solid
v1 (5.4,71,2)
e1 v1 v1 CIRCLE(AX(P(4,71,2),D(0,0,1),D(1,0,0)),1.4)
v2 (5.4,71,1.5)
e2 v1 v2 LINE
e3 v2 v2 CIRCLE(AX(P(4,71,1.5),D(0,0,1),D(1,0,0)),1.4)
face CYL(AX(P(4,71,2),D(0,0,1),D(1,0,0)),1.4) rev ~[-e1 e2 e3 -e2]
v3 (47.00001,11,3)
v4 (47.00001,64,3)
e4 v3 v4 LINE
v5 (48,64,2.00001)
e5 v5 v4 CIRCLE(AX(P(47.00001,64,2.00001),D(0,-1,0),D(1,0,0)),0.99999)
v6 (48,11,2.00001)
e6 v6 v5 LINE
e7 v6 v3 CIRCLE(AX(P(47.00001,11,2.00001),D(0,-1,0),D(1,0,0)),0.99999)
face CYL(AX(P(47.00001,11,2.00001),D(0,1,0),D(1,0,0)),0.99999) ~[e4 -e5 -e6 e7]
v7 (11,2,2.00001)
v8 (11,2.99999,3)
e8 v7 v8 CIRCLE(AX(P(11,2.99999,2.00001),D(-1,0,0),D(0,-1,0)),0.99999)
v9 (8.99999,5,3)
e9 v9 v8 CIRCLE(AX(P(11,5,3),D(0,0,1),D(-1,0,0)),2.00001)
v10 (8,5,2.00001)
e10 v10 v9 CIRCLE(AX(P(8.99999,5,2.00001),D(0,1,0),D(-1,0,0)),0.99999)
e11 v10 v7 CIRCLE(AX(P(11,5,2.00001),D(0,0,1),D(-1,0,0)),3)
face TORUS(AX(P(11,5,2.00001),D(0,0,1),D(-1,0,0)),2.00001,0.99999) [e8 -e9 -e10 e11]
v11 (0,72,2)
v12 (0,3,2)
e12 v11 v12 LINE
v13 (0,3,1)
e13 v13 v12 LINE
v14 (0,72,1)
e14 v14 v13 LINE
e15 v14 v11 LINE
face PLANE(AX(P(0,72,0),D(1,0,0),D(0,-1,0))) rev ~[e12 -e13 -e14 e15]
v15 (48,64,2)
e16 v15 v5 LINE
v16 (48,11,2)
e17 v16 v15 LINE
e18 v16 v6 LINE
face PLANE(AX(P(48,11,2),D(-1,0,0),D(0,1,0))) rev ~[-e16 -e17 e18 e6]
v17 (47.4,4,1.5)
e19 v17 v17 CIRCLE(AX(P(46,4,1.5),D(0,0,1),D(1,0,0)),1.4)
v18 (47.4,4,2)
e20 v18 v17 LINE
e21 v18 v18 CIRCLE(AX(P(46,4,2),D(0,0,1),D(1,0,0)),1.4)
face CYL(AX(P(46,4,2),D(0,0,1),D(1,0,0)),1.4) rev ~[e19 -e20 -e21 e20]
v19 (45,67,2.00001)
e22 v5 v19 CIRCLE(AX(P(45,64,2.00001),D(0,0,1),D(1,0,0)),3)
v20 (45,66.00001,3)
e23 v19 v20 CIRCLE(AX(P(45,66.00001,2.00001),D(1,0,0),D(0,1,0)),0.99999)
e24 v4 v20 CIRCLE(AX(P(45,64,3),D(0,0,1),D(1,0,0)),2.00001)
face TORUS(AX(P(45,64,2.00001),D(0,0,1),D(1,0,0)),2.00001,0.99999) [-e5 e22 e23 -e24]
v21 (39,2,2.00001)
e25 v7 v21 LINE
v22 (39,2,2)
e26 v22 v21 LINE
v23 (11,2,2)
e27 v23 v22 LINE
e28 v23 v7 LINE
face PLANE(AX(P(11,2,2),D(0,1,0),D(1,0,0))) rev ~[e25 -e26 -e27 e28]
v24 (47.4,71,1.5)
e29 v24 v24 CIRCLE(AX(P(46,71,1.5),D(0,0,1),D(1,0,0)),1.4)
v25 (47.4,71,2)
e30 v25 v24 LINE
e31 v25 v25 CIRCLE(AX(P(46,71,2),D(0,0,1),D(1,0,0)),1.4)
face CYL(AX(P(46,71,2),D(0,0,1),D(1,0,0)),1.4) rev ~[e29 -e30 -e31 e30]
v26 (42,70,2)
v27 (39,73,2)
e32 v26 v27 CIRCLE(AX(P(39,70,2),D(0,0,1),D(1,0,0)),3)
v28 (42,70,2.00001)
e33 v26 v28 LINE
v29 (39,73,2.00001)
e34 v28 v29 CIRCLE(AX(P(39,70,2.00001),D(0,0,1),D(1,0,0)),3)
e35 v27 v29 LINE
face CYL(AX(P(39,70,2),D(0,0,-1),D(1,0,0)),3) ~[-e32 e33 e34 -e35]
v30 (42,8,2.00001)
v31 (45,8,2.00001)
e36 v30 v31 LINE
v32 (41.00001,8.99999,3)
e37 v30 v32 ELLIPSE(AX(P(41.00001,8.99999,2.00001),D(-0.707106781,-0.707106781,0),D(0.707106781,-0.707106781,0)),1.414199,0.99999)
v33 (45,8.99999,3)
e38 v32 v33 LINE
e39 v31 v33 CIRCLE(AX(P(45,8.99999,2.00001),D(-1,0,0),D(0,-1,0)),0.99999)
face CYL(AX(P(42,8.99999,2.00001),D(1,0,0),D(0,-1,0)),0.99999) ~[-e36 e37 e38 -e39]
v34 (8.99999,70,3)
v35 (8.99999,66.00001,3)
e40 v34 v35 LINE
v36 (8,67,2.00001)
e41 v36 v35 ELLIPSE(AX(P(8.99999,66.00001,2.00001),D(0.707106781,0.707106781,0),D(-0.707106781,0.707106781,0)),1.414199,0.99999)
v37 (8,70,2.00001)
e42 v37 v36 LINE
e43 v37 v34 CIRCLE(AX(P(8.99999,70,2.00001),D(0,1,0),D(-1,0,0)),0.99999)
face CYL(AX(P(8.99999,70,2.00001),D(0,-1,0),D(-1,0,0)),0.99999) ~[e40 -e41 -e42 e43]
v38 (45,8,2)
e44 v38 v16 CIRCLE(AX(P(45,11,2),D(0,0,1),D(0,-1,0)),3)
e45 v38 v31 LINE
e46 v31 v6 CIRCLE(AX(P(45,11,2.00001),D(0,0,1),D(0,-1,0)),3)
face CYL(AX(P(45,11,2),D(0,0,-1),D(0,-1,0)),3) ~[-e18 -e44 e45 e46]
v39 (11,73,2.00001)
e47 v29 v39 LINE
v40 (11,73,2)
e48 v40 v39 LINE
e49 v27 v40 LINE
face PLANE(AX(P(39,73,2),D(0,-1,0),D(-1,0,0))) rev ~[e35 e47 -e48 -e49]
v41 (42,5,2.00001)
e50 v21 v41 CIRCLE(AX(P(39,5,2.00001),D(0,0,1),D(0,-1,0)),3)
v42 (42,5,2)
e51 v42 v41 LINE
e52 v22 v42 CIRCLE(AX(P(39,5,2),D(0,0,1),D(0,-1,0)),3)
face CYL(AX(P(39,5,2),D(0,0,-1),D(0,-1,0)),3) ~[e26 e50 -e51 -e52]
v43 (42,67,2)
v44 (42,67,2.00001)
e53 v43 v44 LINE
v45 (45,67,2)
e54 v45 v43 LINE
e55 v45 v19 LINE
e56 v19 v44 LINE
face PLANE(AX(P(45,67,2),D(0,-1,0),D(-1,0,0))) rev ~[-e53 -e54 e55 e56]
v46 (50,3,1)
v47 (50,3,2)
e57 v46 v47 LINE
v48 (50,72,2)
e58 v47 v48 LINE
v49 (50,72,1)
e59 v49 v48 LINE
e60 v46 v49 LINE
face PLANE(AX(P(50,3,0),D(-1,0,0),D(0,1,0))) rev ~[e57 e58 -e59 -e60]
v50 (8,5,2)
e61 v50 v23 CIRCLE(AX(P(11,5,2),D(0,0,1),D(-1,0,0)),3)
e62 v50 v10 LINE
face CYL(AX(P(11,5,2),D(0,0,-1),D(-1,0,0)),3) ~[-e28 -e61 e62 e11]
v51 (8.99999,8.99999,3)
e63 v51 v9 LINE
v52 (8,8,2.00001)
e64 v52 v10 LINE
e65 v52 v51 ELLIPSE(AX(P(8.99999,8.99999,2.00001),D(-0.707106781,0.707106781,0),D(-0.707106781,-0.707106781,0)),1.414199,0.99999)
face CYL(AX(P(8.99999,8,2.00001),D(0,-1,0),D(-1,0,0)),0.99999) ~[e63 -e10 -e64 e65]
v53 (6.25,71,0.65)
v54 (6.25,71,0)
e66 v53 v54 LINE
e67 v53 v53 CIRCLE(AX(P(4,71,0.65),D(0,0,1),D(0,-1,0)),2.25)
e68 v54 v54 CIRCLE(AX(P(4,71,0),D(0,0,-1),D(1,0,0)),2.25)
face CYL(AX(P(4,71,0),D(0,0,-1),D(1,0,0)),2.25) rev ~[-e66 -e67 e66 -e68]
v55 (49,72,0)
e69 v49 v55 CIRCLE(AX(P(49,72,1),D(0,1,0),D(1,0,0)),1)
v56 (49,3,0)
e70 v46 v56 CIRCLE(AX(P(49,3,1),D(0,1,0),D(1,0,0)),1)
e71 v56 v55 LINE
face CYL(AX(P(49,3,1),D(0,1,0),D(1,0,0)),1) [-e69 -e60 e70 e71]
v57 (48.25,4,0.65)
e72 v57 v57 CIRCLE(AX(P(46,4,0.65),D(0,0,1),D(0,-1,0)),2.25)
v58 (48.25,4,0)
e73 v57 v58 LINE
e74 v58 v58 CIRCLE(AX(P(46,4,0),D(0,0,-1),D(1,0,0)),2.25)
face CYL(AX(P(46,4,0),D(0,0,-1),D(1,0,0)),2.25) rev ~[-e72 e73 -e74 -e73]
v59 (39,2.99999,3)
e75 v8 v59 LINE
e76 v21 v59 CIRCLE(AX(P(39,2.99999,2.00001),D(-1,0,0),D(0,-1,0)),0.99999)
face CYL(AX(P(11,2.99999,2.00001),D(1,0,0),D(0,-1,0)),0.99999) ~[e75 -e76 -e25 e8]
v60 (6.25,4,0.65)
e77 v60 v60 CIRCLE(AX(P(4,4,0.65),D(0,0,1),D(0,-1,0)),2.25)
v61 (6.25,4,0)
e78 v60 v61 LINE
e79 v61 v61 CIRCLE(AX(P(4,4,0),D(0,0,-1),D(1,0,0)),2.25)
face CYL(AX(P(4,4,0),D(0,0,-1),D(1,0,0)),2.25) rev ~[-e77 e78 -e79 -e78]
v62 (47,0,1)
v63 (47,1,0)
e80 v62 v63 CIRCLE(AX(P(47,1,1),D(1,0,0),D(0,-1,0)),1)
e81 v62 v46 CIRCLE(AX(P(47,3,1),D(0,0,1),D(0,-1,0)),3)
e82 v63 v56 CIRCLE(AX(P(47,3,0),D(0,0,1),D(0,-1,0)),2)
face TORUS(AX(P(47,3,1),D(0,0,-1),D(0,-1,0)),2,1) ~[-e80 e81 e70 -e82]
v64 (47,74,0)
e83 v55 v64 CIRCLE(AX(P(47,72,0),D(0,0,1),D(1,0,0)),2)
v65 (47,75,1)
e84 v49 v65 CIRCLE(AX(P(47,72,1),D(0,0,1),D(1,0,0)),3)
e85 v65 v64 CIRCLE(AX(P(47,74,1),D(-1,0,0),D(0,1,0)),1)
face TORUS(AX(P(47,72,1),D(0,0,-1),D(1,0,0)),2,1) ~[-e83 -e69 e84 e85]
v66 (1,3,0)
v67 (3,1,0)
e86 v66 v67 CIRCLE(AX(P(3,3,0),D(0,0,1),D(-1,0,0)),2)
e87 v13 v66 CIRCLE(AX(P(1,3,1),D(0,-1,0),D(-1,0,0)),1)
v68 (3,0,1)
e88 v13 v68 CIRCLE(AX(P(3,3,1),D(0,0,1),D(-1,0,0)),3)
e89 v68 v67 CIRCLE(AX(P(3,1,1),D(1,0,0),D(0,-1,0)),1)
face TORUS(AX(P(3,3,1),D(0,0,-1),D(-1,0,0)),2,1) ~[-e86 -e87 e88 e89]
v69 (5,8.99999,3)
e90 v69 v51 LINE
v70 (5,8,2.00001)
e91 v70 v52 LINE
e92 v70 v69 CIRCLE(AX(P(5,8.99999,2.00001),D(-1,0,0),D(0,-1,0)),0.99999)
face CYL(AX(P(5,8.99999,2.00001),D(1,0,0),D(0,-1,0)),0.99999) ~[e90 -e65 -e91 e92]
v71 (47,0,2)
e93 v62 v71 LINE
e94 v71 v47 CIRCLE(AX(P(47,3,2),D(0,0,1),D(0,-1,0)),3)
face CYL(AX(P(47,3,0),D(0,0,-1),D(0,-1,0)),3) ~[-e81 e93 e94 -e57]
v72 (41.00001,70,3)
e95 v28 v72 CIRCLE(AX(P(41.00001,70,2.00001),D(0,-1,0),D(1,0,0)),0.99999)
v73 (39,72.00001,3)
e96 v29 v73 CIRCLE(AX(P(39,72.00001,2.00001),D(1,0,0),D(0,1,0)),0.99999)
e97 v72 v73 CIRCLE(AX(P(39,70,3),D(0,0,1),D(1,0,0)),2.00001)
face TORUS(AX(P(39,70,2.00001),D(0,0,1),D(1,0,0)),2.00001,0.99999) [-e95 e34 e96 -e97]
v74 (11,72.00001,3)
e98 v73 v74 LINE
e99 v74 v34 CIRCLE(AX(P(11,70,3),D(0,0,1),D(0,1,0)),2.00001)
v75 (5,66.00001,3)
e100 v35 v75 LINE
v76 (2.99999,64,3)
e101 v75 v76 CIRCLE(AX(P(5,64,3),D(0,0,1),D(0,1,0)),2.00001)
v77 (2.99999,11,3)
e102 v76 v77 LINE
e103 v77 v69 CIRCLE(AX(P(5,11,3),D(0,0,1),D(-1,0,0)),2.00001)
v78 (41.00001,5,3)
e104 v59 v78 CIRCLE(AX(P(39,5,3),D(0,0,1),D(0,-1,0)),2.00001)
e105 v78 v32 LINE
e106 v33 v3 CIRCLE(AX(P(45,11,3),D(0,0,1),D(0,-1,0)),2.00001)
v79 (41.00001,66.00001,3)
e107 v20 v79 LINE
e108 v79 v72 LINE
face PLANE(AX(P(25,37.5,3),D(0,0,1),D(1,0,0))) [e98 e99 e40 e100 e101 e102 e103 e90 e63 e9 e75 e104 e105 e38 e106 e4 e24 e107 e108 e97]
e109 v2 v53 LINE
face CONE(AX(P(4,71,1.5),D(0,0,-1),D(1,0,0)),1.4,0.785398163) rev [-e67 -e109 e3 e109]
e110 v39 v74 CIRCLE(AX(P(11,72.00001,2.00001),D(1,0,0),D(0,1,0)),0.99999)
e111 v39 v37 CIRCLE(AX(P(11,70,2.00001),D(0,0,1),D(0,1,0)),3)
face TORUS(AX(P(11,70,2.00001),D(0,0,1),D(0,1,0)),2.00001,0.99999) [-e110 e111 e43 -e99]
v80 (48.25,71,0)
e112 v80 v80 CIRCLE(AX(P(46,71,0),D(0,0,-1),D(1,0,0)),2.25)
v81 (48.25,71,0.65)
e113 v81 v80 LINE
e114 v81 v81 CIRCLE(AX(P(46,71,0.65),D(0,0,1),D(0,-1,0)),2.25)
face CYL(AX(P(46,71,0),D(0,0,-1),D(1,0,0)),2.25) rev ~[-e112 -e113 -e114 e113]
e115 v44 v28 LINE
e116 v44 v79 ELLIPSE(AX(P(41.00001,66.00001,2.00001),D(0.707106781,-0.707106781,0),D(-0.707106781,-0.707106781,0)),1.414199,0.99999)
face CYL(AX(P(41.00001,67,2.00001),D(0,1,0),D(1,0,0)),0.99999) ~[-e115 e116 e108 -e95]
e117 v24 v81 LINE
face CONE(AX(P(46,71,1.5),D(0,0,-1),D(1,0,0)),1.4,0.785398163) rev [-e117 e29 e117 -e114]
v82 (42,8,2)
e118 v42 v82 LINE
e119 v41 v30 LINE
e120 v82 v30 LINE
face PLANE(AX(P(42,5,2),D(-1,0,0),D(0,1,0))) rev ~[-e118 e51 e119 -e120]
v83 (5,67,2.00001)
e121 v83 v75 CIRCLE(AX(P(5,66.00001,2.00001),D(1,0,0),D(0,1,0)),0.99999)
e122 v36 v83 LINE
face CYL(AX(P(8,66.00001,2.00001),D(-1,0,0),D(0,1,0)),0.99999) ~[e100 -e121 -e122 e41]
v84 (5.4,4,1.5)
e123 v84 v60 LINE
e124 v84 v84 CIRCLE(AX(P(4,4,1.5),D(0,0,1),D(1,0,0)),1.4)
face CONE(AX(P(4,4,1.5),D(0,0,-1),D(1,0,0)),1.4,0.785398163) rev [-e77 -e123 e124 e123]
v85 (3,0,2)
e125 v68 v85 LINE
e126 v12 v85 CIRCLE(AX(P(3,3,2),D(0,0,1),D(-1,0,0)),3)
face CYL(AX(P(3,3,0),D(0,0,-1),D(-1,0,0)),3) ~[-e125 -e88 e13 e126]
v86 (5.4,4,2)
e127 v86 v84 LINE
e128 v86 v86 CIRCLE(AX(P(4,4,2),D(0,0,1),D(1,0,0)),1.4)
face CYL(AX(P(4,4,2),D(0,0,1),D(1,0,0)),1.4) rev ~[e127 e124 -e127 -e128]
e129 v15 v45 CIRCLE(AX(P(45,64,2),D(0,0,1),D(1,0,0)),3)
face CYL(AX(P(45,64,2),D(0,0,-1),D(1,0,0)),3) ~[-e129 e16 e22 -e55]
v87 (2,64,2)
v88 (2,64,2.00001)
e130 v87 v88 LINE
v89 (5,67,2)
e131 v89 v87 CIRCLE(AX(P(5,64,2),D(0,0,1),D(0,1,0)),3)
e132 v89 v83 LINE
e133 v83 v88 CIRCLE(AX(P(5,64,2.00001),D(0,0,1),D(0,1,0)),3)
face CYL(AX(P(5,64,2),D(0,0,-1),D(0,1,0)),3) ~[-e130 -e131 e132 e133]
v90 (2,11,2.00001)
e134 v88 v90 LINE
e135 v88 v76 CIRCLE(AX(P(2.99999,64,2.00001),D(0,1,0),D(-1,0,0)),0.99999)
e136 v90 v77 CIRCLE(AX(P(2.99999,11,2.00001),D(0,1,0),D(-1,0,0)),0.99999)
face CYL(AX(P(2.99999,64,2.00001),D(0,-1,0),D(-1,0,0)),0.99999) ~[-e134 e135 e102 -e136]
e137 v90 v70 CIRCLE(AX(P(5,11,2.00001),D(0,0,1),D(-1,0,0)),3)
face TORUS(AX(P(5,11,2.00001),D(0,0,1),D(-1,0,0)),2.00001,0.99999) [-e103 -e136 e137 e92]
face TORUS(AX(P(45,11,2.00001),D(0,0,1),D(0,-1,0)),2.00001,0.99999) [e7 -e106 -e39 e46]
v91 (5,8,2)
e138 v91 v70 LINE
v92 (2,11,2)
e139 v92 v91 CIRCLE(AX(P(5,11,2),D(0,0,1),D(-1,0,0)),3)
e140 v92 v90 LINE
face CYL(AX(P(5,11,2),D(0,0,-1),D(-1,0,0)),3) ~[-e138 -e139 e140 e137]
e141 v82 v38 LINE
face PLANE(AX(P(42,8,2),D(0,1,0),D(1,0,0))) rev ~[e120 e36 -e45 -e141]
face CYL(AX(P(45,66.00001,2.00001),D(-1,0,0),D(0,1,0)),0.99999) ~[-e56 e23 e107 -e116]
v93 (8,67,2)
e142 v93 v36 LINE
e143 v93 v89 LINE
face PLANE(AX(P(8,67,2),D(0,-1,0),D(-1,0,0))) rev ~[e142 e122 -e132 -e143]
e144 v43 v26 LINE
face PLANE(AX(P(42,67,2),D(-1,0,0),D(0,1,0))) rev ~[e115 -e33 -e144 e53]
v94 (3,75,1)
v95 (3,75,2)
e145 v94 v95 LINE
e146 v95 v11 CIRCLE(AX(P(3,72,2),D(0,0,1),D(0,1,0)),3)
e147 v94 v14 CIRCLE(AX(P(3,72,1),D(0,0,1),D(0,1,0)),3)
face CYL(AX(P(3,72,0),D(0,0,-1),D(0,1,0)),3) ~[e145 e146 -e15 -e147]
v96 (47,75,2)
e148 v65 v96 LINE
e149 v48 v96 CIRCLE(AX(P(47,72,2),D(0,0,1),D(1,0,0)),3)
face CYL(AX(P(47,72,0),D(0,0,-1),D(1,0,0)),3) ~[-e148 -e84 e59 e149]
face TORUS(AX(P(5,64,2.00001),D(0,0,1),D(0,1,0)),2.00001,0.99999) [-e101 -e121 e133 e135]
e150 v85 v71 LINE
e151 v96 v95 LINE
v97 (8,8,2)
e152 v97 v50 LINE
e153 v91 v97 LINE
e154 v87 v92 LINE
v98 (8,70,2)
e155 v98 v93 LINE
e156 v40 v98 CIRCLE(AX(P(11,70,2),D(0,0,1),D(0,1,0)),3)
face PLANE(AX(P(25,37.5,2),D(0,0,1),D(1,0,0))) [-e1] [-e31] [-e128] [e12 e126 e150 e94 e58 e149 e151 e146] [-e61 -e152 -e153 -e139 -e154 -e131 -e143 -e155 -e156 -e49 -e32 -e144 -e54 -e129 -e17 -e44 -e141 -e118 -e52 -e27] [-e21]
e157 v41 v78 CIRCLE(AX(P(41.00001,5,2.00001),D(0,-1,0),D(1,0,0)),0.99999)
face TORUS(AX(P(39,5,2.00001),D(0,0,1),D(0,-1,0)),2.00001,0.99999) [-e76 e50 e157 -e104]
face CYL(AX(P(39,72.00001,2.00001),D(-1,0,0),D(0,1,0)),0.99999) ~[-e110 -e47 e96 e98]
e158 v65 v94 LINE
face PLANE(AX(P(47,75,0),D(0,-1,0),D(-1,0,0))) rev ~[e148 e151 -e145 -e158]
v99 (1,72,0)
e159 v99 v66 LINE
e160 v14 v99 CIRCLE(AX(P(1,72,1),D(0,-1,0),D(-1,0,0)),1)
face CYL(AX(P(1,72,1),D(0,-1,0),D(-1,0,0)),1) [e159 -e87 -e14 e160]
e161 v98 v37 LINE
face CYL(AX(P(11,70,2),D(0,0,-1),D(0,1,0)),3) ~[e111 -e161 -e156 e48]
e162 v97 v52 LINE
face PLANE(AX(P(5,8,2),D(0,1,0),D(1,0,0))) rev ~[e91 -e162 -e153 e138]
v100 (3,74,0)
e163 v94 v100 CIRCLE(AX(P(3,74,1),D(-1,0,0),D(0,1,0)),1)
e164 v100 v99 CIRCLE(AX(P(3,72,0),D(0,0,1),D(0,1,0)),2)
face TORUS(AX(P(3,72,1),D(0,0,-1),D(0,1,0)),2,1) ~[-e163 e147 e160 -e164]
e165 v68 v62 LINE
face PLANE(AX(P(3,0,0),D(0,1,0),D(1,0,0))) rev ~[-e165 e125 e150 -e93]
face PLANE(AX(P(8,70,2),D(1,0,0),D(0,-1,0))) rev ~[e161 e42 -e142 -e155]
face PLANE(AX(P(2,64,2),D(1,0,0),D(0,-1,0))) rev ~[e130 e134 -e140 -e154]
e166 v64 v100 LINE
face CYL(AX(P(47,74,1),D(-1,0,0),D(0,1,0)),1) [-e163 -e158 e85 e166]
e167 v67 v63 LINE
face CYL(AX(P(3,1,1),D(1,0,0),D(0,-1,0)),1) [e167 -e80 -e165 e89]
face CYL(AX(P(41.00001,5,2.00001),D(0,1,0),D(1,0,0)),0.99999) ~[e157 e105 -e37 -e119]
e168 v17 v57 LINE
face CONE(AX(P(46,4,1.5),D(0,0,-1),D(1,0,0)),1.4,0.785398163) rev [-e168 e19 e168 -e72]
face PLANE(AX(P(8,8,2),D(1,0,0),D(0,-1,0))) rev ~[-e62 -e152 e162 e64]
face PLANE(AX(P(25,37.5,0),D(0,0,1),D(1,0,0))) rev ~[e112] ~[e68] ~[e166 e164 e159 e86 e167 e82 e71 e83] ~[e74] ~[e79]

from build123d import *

# Parameters (mm, degrees)
F1_DEPTH      = 2
F2_R          = 1.4
F3_DEPTH      = 5
F5_DEPTH      = 1
F6_R          = 0.99999
F7_R          = 1
F8_R          = 2.25
F9_DEPTH      = 0.5
F10_S5_R      = 2.25
F10_T6_DEPTH  = 5
F10_S11_R     = 2.25
F10_T12_DEPTH = 5
F10_S17_R     = 2.25
F10_T18_DEPTH = 5
F10_S23_R     = 2.25
F10_T24_DEPTH = 5


# Not quite as in the source:
# - a fillet or chamfer that OpenCascade refuses, or shapes differently, is made with other operations: its cross-section is extruded or revolved along the edge and cut away or added
# - a fillet or chamfer is up to 0.001 mm smaller than in the source, because OpenCascade refuses the exact size


with BuildPart() as f1:
    # F0 (on Top) → F1 (new body)
    with BuildSketch(Plane.XY):
        with BuildLine():
            ThreePointArc((0, 3), (0.8786796564, 0.8786796564), (3, 0))
            Line((3, 0), (47, 0))
            ThreePointArc((47, 0), (49.1213203436, 0.8786796564), (50, 3))
            Line((50, 3), (50, 72))
            ThreePointArc((50, 72), (49.1213203436, 74.1213203436), (47, 75))
            Line((47, 75), (3, 75))
            ThreePointArc((3, 75), (0.8786796564, 74.1213203436), (0, 72))
            Line((0, 72), (0, 3))
        make_face()
    extrude(amount=F1_DEPTH)

    # F2 (on face) → F3 (cut)
    with BuildSketch(Plane.XY.offset(2)):
        with Locations((4, 71)):
            Circle(F2_R)
        with Locations((46, 71)):
            Circle(F2_R)
        with Locations((4, 4)):
            Circle(F2_R)
        with Locations((46, 4)):
            Circle(F2_R)
    extrude(amount=-F3_DEPTH, mode=Mode.SUBTRACT)

    # F4 (on face) → F5 (join)
    with BuildSketch(Plane.XY.offset(2)):
        with BuildLine():
            ThreePointArc((8, 5), (8.8786796564, 2.8786796564), (11, 2))
            Line((11, 2), (39, 2))
            ThreePointArc((39, 2), (41.1213203436, 2.8786796564), (42, 5))
            Line((42, 5), (42, 8))
            Line((42, 8), (45, 8))
            ThreePointArc((45, 8), (47.1213203436, 8.8786796564), (48, 11))
            Line((48, 11), (48, 64))
            ThreePointArc((48, 64), (47.1213203436, 66.1213203436), (45, 67))
            Line((45, 67), (42, 67))
            Line((42, 67), (42, 70))
            ThreePointArc((42, 70), (41.1213203436, 72.1213203436), (39, 73))
            Line((39, 73), (11, 73))
            ThreePointArc((11, 73), (8.8786796564, 72.1213203436), (8, 70))
            Line((8, 70), (8, 67))
            Line((8, 67), (5, 67))
            ThreePointArc((5, 67), (2.8786796564, 66.1213203436), (2, 64))
            Line((2, 64), (2, 11))
            ThreePointArc((2, 11), (2.8786796564, 8.8786796564), (5, 8))
            Line((5, 8), (8, 8))
            Line((8, 8), (8, 5))
        make_face()
    extrude(amount=F5_DEPTH)

    # F6 (radius 1 in the source; OpenCascade refuses exactly that, so slightly less here)
    f6_edges = [f1.edges().sort_by_distance(p)[0] for p in [
        (47.12132, 8.87868, 3),
        (43.5, 8, 3),
        (42, 6.5, 3),
        (41.12132, 2.87868, 3),
        (25, 2, 3),
        (8.87868, 2.87868, 3),
        (8, 6.5, 3),
        (6.5, 8, 3),
        (2.87868, 8.87868, 3),
        (2, 37.5, 3),
        (2.87868, 66.12132, 3),
        (6.5, 67, 3),
        (8, 68.5, 3),
        (8.87868, 72.12132, 3),
        (25, 73, 3),
        (41.12132, 72.12132, 3),
        (42, 68.5, 3),
        (43.5, 67, 3),
        (47.12132, 66.12132, 3),
        (48, 37.5, 3),
    ]]
    fillet(f6_edges, radius=F6_R)

    # F7
    f7_edges = [f1.edges().sort_by_distance(p)[0] for p in [
        (0, 37.5, 0),
    ]]
    fillet(f7_edges, radius=F7_R)

    # F8 (on face) → F9 (cut)
    with BuildSketch(Plane(origin=(0, 0, 0), x_dir=(1, 0, 0), z_dir=(0, 0, -1))):
        with Locations((4, -4)):
            Circle(F8_R)
        with Locations((46, -4)):
            Circle(F8_R)
        with Locations((46, -71)):
            Circle(F8_R)
        with Locations((4, -71)):
            Circle(F8_R)
    extrude(amount=-F9_DEPTH, mode=Mode.SUBTRACT)

    # F10: chamfer of 1 on 4 edges, made by hand


with BuildPart() as f10_tool2:
    # F10_s3 → F10_t4 (revolve)
    with BuildSketch(Plane.XZ.offset(-4)):
        Polygon((5.4, 1.5), (6.4, 0.5), (5.4, 0.5), align=None)
    revolve(axis=Axis((4, 4, 0.5), (0, 0, 1)))

    # F10_s5 → F10_t6 (intersect, symmetric)
    with BuildSketch(Plane.XY.offset(1)):
        with Locations((4, 4)):
            Circle(F10_S5_R)
    extrude(amount=F10_T6_DEPTH, both=True, mode=Mode.INTERSECT)


with BuildPart() as f1_1:
    add(f1.part)

    # F10_t1: cut F10_tool2
    add(f10_tool2.part, mode=Mode.SUBTRACT)


with BuildPart() as f10_tool8:
    # F10_s9 → F10_t10 (revolve)
    with BuildSketch(Plane.XZ.offset(-4)):
        Polygon((47.4, 1.5), (48.4, 0.5), (47.4, 0.5), align=None)
    revolve(axis=Axis((46, 4, 0.5), (0, 0, 1)))

    # F10_s11 → F10_t12 (intersect, symmetric)
    with BuildSketch(Plane.XY.offset(1)):
        with Locations((46, 4)):
            Circle(F10_S11_R)
    extrude(amount=F10_T12_DEPTH, both=True, mode=Mode.INTERSECT)


with BuildPart() as f1_2:
    add(f1_1.part)

    # F10_t7: cut F10_tool8
    add(f10_tool8.part, mode=Mode.SUBTRACT)


with BuildPart() as f10_tool14:
    # F10_s15 → F10_t16 (revolve)
    with BuildSketch(Plane.XZ.offset(-71)):
        Polygon((5.4, 1.5), (6.4, 0.5), (5.4, 0.5), align=None)
    revolve(axis=Axis((4, 71, 0.5), (0, 0, 1)))

    # F10_s17 → F10_t18 (intersect, symmetric)
    with BuildSketch(Plane.XY.offset(1)):
        with Locations((4, 71)):
            Circle(F10_S17_R)
    extrude(amount=F10_T18_DEPTH, both=True, mode=Mode.INTERSECT)


with BuildPart() as f1_3:
    add(f1_2.part)

    # F10_t13: cut F10_tool14
    add(f10_tool14.part, mode=Mode.SUBTRACT)


with BuildPart() as f10_tool20:
    # F10_s21 → F10_t22 (revolve)
    with BuildSketch(Plane.XZ.offset(-71)):
        Polygon((47.4, 1.5), (48.4, 0.5), (47.4, 0.5), align=None)
    revolve(axis=Axis((46, 71, 0.5), (0, 0, 1)))

    # F10_s23 → F10_t24 (intersect, symmetric)
    with BuildSketch(Plane.XY.offset(1)):
        with Locations((46, 71)):
            Circle(F10_S23_R)
    extrude(amount=F10_T24_DEPTH, both=True, mode=Mode.INTERSECT)


with BuildPart() as f1_4:
    add(f1_3.part)

    # F10_t19: cut F10_tool20
    add(f10_tool20.part, mode=Mode.SUBTRACT)


solid = f1_4.part
